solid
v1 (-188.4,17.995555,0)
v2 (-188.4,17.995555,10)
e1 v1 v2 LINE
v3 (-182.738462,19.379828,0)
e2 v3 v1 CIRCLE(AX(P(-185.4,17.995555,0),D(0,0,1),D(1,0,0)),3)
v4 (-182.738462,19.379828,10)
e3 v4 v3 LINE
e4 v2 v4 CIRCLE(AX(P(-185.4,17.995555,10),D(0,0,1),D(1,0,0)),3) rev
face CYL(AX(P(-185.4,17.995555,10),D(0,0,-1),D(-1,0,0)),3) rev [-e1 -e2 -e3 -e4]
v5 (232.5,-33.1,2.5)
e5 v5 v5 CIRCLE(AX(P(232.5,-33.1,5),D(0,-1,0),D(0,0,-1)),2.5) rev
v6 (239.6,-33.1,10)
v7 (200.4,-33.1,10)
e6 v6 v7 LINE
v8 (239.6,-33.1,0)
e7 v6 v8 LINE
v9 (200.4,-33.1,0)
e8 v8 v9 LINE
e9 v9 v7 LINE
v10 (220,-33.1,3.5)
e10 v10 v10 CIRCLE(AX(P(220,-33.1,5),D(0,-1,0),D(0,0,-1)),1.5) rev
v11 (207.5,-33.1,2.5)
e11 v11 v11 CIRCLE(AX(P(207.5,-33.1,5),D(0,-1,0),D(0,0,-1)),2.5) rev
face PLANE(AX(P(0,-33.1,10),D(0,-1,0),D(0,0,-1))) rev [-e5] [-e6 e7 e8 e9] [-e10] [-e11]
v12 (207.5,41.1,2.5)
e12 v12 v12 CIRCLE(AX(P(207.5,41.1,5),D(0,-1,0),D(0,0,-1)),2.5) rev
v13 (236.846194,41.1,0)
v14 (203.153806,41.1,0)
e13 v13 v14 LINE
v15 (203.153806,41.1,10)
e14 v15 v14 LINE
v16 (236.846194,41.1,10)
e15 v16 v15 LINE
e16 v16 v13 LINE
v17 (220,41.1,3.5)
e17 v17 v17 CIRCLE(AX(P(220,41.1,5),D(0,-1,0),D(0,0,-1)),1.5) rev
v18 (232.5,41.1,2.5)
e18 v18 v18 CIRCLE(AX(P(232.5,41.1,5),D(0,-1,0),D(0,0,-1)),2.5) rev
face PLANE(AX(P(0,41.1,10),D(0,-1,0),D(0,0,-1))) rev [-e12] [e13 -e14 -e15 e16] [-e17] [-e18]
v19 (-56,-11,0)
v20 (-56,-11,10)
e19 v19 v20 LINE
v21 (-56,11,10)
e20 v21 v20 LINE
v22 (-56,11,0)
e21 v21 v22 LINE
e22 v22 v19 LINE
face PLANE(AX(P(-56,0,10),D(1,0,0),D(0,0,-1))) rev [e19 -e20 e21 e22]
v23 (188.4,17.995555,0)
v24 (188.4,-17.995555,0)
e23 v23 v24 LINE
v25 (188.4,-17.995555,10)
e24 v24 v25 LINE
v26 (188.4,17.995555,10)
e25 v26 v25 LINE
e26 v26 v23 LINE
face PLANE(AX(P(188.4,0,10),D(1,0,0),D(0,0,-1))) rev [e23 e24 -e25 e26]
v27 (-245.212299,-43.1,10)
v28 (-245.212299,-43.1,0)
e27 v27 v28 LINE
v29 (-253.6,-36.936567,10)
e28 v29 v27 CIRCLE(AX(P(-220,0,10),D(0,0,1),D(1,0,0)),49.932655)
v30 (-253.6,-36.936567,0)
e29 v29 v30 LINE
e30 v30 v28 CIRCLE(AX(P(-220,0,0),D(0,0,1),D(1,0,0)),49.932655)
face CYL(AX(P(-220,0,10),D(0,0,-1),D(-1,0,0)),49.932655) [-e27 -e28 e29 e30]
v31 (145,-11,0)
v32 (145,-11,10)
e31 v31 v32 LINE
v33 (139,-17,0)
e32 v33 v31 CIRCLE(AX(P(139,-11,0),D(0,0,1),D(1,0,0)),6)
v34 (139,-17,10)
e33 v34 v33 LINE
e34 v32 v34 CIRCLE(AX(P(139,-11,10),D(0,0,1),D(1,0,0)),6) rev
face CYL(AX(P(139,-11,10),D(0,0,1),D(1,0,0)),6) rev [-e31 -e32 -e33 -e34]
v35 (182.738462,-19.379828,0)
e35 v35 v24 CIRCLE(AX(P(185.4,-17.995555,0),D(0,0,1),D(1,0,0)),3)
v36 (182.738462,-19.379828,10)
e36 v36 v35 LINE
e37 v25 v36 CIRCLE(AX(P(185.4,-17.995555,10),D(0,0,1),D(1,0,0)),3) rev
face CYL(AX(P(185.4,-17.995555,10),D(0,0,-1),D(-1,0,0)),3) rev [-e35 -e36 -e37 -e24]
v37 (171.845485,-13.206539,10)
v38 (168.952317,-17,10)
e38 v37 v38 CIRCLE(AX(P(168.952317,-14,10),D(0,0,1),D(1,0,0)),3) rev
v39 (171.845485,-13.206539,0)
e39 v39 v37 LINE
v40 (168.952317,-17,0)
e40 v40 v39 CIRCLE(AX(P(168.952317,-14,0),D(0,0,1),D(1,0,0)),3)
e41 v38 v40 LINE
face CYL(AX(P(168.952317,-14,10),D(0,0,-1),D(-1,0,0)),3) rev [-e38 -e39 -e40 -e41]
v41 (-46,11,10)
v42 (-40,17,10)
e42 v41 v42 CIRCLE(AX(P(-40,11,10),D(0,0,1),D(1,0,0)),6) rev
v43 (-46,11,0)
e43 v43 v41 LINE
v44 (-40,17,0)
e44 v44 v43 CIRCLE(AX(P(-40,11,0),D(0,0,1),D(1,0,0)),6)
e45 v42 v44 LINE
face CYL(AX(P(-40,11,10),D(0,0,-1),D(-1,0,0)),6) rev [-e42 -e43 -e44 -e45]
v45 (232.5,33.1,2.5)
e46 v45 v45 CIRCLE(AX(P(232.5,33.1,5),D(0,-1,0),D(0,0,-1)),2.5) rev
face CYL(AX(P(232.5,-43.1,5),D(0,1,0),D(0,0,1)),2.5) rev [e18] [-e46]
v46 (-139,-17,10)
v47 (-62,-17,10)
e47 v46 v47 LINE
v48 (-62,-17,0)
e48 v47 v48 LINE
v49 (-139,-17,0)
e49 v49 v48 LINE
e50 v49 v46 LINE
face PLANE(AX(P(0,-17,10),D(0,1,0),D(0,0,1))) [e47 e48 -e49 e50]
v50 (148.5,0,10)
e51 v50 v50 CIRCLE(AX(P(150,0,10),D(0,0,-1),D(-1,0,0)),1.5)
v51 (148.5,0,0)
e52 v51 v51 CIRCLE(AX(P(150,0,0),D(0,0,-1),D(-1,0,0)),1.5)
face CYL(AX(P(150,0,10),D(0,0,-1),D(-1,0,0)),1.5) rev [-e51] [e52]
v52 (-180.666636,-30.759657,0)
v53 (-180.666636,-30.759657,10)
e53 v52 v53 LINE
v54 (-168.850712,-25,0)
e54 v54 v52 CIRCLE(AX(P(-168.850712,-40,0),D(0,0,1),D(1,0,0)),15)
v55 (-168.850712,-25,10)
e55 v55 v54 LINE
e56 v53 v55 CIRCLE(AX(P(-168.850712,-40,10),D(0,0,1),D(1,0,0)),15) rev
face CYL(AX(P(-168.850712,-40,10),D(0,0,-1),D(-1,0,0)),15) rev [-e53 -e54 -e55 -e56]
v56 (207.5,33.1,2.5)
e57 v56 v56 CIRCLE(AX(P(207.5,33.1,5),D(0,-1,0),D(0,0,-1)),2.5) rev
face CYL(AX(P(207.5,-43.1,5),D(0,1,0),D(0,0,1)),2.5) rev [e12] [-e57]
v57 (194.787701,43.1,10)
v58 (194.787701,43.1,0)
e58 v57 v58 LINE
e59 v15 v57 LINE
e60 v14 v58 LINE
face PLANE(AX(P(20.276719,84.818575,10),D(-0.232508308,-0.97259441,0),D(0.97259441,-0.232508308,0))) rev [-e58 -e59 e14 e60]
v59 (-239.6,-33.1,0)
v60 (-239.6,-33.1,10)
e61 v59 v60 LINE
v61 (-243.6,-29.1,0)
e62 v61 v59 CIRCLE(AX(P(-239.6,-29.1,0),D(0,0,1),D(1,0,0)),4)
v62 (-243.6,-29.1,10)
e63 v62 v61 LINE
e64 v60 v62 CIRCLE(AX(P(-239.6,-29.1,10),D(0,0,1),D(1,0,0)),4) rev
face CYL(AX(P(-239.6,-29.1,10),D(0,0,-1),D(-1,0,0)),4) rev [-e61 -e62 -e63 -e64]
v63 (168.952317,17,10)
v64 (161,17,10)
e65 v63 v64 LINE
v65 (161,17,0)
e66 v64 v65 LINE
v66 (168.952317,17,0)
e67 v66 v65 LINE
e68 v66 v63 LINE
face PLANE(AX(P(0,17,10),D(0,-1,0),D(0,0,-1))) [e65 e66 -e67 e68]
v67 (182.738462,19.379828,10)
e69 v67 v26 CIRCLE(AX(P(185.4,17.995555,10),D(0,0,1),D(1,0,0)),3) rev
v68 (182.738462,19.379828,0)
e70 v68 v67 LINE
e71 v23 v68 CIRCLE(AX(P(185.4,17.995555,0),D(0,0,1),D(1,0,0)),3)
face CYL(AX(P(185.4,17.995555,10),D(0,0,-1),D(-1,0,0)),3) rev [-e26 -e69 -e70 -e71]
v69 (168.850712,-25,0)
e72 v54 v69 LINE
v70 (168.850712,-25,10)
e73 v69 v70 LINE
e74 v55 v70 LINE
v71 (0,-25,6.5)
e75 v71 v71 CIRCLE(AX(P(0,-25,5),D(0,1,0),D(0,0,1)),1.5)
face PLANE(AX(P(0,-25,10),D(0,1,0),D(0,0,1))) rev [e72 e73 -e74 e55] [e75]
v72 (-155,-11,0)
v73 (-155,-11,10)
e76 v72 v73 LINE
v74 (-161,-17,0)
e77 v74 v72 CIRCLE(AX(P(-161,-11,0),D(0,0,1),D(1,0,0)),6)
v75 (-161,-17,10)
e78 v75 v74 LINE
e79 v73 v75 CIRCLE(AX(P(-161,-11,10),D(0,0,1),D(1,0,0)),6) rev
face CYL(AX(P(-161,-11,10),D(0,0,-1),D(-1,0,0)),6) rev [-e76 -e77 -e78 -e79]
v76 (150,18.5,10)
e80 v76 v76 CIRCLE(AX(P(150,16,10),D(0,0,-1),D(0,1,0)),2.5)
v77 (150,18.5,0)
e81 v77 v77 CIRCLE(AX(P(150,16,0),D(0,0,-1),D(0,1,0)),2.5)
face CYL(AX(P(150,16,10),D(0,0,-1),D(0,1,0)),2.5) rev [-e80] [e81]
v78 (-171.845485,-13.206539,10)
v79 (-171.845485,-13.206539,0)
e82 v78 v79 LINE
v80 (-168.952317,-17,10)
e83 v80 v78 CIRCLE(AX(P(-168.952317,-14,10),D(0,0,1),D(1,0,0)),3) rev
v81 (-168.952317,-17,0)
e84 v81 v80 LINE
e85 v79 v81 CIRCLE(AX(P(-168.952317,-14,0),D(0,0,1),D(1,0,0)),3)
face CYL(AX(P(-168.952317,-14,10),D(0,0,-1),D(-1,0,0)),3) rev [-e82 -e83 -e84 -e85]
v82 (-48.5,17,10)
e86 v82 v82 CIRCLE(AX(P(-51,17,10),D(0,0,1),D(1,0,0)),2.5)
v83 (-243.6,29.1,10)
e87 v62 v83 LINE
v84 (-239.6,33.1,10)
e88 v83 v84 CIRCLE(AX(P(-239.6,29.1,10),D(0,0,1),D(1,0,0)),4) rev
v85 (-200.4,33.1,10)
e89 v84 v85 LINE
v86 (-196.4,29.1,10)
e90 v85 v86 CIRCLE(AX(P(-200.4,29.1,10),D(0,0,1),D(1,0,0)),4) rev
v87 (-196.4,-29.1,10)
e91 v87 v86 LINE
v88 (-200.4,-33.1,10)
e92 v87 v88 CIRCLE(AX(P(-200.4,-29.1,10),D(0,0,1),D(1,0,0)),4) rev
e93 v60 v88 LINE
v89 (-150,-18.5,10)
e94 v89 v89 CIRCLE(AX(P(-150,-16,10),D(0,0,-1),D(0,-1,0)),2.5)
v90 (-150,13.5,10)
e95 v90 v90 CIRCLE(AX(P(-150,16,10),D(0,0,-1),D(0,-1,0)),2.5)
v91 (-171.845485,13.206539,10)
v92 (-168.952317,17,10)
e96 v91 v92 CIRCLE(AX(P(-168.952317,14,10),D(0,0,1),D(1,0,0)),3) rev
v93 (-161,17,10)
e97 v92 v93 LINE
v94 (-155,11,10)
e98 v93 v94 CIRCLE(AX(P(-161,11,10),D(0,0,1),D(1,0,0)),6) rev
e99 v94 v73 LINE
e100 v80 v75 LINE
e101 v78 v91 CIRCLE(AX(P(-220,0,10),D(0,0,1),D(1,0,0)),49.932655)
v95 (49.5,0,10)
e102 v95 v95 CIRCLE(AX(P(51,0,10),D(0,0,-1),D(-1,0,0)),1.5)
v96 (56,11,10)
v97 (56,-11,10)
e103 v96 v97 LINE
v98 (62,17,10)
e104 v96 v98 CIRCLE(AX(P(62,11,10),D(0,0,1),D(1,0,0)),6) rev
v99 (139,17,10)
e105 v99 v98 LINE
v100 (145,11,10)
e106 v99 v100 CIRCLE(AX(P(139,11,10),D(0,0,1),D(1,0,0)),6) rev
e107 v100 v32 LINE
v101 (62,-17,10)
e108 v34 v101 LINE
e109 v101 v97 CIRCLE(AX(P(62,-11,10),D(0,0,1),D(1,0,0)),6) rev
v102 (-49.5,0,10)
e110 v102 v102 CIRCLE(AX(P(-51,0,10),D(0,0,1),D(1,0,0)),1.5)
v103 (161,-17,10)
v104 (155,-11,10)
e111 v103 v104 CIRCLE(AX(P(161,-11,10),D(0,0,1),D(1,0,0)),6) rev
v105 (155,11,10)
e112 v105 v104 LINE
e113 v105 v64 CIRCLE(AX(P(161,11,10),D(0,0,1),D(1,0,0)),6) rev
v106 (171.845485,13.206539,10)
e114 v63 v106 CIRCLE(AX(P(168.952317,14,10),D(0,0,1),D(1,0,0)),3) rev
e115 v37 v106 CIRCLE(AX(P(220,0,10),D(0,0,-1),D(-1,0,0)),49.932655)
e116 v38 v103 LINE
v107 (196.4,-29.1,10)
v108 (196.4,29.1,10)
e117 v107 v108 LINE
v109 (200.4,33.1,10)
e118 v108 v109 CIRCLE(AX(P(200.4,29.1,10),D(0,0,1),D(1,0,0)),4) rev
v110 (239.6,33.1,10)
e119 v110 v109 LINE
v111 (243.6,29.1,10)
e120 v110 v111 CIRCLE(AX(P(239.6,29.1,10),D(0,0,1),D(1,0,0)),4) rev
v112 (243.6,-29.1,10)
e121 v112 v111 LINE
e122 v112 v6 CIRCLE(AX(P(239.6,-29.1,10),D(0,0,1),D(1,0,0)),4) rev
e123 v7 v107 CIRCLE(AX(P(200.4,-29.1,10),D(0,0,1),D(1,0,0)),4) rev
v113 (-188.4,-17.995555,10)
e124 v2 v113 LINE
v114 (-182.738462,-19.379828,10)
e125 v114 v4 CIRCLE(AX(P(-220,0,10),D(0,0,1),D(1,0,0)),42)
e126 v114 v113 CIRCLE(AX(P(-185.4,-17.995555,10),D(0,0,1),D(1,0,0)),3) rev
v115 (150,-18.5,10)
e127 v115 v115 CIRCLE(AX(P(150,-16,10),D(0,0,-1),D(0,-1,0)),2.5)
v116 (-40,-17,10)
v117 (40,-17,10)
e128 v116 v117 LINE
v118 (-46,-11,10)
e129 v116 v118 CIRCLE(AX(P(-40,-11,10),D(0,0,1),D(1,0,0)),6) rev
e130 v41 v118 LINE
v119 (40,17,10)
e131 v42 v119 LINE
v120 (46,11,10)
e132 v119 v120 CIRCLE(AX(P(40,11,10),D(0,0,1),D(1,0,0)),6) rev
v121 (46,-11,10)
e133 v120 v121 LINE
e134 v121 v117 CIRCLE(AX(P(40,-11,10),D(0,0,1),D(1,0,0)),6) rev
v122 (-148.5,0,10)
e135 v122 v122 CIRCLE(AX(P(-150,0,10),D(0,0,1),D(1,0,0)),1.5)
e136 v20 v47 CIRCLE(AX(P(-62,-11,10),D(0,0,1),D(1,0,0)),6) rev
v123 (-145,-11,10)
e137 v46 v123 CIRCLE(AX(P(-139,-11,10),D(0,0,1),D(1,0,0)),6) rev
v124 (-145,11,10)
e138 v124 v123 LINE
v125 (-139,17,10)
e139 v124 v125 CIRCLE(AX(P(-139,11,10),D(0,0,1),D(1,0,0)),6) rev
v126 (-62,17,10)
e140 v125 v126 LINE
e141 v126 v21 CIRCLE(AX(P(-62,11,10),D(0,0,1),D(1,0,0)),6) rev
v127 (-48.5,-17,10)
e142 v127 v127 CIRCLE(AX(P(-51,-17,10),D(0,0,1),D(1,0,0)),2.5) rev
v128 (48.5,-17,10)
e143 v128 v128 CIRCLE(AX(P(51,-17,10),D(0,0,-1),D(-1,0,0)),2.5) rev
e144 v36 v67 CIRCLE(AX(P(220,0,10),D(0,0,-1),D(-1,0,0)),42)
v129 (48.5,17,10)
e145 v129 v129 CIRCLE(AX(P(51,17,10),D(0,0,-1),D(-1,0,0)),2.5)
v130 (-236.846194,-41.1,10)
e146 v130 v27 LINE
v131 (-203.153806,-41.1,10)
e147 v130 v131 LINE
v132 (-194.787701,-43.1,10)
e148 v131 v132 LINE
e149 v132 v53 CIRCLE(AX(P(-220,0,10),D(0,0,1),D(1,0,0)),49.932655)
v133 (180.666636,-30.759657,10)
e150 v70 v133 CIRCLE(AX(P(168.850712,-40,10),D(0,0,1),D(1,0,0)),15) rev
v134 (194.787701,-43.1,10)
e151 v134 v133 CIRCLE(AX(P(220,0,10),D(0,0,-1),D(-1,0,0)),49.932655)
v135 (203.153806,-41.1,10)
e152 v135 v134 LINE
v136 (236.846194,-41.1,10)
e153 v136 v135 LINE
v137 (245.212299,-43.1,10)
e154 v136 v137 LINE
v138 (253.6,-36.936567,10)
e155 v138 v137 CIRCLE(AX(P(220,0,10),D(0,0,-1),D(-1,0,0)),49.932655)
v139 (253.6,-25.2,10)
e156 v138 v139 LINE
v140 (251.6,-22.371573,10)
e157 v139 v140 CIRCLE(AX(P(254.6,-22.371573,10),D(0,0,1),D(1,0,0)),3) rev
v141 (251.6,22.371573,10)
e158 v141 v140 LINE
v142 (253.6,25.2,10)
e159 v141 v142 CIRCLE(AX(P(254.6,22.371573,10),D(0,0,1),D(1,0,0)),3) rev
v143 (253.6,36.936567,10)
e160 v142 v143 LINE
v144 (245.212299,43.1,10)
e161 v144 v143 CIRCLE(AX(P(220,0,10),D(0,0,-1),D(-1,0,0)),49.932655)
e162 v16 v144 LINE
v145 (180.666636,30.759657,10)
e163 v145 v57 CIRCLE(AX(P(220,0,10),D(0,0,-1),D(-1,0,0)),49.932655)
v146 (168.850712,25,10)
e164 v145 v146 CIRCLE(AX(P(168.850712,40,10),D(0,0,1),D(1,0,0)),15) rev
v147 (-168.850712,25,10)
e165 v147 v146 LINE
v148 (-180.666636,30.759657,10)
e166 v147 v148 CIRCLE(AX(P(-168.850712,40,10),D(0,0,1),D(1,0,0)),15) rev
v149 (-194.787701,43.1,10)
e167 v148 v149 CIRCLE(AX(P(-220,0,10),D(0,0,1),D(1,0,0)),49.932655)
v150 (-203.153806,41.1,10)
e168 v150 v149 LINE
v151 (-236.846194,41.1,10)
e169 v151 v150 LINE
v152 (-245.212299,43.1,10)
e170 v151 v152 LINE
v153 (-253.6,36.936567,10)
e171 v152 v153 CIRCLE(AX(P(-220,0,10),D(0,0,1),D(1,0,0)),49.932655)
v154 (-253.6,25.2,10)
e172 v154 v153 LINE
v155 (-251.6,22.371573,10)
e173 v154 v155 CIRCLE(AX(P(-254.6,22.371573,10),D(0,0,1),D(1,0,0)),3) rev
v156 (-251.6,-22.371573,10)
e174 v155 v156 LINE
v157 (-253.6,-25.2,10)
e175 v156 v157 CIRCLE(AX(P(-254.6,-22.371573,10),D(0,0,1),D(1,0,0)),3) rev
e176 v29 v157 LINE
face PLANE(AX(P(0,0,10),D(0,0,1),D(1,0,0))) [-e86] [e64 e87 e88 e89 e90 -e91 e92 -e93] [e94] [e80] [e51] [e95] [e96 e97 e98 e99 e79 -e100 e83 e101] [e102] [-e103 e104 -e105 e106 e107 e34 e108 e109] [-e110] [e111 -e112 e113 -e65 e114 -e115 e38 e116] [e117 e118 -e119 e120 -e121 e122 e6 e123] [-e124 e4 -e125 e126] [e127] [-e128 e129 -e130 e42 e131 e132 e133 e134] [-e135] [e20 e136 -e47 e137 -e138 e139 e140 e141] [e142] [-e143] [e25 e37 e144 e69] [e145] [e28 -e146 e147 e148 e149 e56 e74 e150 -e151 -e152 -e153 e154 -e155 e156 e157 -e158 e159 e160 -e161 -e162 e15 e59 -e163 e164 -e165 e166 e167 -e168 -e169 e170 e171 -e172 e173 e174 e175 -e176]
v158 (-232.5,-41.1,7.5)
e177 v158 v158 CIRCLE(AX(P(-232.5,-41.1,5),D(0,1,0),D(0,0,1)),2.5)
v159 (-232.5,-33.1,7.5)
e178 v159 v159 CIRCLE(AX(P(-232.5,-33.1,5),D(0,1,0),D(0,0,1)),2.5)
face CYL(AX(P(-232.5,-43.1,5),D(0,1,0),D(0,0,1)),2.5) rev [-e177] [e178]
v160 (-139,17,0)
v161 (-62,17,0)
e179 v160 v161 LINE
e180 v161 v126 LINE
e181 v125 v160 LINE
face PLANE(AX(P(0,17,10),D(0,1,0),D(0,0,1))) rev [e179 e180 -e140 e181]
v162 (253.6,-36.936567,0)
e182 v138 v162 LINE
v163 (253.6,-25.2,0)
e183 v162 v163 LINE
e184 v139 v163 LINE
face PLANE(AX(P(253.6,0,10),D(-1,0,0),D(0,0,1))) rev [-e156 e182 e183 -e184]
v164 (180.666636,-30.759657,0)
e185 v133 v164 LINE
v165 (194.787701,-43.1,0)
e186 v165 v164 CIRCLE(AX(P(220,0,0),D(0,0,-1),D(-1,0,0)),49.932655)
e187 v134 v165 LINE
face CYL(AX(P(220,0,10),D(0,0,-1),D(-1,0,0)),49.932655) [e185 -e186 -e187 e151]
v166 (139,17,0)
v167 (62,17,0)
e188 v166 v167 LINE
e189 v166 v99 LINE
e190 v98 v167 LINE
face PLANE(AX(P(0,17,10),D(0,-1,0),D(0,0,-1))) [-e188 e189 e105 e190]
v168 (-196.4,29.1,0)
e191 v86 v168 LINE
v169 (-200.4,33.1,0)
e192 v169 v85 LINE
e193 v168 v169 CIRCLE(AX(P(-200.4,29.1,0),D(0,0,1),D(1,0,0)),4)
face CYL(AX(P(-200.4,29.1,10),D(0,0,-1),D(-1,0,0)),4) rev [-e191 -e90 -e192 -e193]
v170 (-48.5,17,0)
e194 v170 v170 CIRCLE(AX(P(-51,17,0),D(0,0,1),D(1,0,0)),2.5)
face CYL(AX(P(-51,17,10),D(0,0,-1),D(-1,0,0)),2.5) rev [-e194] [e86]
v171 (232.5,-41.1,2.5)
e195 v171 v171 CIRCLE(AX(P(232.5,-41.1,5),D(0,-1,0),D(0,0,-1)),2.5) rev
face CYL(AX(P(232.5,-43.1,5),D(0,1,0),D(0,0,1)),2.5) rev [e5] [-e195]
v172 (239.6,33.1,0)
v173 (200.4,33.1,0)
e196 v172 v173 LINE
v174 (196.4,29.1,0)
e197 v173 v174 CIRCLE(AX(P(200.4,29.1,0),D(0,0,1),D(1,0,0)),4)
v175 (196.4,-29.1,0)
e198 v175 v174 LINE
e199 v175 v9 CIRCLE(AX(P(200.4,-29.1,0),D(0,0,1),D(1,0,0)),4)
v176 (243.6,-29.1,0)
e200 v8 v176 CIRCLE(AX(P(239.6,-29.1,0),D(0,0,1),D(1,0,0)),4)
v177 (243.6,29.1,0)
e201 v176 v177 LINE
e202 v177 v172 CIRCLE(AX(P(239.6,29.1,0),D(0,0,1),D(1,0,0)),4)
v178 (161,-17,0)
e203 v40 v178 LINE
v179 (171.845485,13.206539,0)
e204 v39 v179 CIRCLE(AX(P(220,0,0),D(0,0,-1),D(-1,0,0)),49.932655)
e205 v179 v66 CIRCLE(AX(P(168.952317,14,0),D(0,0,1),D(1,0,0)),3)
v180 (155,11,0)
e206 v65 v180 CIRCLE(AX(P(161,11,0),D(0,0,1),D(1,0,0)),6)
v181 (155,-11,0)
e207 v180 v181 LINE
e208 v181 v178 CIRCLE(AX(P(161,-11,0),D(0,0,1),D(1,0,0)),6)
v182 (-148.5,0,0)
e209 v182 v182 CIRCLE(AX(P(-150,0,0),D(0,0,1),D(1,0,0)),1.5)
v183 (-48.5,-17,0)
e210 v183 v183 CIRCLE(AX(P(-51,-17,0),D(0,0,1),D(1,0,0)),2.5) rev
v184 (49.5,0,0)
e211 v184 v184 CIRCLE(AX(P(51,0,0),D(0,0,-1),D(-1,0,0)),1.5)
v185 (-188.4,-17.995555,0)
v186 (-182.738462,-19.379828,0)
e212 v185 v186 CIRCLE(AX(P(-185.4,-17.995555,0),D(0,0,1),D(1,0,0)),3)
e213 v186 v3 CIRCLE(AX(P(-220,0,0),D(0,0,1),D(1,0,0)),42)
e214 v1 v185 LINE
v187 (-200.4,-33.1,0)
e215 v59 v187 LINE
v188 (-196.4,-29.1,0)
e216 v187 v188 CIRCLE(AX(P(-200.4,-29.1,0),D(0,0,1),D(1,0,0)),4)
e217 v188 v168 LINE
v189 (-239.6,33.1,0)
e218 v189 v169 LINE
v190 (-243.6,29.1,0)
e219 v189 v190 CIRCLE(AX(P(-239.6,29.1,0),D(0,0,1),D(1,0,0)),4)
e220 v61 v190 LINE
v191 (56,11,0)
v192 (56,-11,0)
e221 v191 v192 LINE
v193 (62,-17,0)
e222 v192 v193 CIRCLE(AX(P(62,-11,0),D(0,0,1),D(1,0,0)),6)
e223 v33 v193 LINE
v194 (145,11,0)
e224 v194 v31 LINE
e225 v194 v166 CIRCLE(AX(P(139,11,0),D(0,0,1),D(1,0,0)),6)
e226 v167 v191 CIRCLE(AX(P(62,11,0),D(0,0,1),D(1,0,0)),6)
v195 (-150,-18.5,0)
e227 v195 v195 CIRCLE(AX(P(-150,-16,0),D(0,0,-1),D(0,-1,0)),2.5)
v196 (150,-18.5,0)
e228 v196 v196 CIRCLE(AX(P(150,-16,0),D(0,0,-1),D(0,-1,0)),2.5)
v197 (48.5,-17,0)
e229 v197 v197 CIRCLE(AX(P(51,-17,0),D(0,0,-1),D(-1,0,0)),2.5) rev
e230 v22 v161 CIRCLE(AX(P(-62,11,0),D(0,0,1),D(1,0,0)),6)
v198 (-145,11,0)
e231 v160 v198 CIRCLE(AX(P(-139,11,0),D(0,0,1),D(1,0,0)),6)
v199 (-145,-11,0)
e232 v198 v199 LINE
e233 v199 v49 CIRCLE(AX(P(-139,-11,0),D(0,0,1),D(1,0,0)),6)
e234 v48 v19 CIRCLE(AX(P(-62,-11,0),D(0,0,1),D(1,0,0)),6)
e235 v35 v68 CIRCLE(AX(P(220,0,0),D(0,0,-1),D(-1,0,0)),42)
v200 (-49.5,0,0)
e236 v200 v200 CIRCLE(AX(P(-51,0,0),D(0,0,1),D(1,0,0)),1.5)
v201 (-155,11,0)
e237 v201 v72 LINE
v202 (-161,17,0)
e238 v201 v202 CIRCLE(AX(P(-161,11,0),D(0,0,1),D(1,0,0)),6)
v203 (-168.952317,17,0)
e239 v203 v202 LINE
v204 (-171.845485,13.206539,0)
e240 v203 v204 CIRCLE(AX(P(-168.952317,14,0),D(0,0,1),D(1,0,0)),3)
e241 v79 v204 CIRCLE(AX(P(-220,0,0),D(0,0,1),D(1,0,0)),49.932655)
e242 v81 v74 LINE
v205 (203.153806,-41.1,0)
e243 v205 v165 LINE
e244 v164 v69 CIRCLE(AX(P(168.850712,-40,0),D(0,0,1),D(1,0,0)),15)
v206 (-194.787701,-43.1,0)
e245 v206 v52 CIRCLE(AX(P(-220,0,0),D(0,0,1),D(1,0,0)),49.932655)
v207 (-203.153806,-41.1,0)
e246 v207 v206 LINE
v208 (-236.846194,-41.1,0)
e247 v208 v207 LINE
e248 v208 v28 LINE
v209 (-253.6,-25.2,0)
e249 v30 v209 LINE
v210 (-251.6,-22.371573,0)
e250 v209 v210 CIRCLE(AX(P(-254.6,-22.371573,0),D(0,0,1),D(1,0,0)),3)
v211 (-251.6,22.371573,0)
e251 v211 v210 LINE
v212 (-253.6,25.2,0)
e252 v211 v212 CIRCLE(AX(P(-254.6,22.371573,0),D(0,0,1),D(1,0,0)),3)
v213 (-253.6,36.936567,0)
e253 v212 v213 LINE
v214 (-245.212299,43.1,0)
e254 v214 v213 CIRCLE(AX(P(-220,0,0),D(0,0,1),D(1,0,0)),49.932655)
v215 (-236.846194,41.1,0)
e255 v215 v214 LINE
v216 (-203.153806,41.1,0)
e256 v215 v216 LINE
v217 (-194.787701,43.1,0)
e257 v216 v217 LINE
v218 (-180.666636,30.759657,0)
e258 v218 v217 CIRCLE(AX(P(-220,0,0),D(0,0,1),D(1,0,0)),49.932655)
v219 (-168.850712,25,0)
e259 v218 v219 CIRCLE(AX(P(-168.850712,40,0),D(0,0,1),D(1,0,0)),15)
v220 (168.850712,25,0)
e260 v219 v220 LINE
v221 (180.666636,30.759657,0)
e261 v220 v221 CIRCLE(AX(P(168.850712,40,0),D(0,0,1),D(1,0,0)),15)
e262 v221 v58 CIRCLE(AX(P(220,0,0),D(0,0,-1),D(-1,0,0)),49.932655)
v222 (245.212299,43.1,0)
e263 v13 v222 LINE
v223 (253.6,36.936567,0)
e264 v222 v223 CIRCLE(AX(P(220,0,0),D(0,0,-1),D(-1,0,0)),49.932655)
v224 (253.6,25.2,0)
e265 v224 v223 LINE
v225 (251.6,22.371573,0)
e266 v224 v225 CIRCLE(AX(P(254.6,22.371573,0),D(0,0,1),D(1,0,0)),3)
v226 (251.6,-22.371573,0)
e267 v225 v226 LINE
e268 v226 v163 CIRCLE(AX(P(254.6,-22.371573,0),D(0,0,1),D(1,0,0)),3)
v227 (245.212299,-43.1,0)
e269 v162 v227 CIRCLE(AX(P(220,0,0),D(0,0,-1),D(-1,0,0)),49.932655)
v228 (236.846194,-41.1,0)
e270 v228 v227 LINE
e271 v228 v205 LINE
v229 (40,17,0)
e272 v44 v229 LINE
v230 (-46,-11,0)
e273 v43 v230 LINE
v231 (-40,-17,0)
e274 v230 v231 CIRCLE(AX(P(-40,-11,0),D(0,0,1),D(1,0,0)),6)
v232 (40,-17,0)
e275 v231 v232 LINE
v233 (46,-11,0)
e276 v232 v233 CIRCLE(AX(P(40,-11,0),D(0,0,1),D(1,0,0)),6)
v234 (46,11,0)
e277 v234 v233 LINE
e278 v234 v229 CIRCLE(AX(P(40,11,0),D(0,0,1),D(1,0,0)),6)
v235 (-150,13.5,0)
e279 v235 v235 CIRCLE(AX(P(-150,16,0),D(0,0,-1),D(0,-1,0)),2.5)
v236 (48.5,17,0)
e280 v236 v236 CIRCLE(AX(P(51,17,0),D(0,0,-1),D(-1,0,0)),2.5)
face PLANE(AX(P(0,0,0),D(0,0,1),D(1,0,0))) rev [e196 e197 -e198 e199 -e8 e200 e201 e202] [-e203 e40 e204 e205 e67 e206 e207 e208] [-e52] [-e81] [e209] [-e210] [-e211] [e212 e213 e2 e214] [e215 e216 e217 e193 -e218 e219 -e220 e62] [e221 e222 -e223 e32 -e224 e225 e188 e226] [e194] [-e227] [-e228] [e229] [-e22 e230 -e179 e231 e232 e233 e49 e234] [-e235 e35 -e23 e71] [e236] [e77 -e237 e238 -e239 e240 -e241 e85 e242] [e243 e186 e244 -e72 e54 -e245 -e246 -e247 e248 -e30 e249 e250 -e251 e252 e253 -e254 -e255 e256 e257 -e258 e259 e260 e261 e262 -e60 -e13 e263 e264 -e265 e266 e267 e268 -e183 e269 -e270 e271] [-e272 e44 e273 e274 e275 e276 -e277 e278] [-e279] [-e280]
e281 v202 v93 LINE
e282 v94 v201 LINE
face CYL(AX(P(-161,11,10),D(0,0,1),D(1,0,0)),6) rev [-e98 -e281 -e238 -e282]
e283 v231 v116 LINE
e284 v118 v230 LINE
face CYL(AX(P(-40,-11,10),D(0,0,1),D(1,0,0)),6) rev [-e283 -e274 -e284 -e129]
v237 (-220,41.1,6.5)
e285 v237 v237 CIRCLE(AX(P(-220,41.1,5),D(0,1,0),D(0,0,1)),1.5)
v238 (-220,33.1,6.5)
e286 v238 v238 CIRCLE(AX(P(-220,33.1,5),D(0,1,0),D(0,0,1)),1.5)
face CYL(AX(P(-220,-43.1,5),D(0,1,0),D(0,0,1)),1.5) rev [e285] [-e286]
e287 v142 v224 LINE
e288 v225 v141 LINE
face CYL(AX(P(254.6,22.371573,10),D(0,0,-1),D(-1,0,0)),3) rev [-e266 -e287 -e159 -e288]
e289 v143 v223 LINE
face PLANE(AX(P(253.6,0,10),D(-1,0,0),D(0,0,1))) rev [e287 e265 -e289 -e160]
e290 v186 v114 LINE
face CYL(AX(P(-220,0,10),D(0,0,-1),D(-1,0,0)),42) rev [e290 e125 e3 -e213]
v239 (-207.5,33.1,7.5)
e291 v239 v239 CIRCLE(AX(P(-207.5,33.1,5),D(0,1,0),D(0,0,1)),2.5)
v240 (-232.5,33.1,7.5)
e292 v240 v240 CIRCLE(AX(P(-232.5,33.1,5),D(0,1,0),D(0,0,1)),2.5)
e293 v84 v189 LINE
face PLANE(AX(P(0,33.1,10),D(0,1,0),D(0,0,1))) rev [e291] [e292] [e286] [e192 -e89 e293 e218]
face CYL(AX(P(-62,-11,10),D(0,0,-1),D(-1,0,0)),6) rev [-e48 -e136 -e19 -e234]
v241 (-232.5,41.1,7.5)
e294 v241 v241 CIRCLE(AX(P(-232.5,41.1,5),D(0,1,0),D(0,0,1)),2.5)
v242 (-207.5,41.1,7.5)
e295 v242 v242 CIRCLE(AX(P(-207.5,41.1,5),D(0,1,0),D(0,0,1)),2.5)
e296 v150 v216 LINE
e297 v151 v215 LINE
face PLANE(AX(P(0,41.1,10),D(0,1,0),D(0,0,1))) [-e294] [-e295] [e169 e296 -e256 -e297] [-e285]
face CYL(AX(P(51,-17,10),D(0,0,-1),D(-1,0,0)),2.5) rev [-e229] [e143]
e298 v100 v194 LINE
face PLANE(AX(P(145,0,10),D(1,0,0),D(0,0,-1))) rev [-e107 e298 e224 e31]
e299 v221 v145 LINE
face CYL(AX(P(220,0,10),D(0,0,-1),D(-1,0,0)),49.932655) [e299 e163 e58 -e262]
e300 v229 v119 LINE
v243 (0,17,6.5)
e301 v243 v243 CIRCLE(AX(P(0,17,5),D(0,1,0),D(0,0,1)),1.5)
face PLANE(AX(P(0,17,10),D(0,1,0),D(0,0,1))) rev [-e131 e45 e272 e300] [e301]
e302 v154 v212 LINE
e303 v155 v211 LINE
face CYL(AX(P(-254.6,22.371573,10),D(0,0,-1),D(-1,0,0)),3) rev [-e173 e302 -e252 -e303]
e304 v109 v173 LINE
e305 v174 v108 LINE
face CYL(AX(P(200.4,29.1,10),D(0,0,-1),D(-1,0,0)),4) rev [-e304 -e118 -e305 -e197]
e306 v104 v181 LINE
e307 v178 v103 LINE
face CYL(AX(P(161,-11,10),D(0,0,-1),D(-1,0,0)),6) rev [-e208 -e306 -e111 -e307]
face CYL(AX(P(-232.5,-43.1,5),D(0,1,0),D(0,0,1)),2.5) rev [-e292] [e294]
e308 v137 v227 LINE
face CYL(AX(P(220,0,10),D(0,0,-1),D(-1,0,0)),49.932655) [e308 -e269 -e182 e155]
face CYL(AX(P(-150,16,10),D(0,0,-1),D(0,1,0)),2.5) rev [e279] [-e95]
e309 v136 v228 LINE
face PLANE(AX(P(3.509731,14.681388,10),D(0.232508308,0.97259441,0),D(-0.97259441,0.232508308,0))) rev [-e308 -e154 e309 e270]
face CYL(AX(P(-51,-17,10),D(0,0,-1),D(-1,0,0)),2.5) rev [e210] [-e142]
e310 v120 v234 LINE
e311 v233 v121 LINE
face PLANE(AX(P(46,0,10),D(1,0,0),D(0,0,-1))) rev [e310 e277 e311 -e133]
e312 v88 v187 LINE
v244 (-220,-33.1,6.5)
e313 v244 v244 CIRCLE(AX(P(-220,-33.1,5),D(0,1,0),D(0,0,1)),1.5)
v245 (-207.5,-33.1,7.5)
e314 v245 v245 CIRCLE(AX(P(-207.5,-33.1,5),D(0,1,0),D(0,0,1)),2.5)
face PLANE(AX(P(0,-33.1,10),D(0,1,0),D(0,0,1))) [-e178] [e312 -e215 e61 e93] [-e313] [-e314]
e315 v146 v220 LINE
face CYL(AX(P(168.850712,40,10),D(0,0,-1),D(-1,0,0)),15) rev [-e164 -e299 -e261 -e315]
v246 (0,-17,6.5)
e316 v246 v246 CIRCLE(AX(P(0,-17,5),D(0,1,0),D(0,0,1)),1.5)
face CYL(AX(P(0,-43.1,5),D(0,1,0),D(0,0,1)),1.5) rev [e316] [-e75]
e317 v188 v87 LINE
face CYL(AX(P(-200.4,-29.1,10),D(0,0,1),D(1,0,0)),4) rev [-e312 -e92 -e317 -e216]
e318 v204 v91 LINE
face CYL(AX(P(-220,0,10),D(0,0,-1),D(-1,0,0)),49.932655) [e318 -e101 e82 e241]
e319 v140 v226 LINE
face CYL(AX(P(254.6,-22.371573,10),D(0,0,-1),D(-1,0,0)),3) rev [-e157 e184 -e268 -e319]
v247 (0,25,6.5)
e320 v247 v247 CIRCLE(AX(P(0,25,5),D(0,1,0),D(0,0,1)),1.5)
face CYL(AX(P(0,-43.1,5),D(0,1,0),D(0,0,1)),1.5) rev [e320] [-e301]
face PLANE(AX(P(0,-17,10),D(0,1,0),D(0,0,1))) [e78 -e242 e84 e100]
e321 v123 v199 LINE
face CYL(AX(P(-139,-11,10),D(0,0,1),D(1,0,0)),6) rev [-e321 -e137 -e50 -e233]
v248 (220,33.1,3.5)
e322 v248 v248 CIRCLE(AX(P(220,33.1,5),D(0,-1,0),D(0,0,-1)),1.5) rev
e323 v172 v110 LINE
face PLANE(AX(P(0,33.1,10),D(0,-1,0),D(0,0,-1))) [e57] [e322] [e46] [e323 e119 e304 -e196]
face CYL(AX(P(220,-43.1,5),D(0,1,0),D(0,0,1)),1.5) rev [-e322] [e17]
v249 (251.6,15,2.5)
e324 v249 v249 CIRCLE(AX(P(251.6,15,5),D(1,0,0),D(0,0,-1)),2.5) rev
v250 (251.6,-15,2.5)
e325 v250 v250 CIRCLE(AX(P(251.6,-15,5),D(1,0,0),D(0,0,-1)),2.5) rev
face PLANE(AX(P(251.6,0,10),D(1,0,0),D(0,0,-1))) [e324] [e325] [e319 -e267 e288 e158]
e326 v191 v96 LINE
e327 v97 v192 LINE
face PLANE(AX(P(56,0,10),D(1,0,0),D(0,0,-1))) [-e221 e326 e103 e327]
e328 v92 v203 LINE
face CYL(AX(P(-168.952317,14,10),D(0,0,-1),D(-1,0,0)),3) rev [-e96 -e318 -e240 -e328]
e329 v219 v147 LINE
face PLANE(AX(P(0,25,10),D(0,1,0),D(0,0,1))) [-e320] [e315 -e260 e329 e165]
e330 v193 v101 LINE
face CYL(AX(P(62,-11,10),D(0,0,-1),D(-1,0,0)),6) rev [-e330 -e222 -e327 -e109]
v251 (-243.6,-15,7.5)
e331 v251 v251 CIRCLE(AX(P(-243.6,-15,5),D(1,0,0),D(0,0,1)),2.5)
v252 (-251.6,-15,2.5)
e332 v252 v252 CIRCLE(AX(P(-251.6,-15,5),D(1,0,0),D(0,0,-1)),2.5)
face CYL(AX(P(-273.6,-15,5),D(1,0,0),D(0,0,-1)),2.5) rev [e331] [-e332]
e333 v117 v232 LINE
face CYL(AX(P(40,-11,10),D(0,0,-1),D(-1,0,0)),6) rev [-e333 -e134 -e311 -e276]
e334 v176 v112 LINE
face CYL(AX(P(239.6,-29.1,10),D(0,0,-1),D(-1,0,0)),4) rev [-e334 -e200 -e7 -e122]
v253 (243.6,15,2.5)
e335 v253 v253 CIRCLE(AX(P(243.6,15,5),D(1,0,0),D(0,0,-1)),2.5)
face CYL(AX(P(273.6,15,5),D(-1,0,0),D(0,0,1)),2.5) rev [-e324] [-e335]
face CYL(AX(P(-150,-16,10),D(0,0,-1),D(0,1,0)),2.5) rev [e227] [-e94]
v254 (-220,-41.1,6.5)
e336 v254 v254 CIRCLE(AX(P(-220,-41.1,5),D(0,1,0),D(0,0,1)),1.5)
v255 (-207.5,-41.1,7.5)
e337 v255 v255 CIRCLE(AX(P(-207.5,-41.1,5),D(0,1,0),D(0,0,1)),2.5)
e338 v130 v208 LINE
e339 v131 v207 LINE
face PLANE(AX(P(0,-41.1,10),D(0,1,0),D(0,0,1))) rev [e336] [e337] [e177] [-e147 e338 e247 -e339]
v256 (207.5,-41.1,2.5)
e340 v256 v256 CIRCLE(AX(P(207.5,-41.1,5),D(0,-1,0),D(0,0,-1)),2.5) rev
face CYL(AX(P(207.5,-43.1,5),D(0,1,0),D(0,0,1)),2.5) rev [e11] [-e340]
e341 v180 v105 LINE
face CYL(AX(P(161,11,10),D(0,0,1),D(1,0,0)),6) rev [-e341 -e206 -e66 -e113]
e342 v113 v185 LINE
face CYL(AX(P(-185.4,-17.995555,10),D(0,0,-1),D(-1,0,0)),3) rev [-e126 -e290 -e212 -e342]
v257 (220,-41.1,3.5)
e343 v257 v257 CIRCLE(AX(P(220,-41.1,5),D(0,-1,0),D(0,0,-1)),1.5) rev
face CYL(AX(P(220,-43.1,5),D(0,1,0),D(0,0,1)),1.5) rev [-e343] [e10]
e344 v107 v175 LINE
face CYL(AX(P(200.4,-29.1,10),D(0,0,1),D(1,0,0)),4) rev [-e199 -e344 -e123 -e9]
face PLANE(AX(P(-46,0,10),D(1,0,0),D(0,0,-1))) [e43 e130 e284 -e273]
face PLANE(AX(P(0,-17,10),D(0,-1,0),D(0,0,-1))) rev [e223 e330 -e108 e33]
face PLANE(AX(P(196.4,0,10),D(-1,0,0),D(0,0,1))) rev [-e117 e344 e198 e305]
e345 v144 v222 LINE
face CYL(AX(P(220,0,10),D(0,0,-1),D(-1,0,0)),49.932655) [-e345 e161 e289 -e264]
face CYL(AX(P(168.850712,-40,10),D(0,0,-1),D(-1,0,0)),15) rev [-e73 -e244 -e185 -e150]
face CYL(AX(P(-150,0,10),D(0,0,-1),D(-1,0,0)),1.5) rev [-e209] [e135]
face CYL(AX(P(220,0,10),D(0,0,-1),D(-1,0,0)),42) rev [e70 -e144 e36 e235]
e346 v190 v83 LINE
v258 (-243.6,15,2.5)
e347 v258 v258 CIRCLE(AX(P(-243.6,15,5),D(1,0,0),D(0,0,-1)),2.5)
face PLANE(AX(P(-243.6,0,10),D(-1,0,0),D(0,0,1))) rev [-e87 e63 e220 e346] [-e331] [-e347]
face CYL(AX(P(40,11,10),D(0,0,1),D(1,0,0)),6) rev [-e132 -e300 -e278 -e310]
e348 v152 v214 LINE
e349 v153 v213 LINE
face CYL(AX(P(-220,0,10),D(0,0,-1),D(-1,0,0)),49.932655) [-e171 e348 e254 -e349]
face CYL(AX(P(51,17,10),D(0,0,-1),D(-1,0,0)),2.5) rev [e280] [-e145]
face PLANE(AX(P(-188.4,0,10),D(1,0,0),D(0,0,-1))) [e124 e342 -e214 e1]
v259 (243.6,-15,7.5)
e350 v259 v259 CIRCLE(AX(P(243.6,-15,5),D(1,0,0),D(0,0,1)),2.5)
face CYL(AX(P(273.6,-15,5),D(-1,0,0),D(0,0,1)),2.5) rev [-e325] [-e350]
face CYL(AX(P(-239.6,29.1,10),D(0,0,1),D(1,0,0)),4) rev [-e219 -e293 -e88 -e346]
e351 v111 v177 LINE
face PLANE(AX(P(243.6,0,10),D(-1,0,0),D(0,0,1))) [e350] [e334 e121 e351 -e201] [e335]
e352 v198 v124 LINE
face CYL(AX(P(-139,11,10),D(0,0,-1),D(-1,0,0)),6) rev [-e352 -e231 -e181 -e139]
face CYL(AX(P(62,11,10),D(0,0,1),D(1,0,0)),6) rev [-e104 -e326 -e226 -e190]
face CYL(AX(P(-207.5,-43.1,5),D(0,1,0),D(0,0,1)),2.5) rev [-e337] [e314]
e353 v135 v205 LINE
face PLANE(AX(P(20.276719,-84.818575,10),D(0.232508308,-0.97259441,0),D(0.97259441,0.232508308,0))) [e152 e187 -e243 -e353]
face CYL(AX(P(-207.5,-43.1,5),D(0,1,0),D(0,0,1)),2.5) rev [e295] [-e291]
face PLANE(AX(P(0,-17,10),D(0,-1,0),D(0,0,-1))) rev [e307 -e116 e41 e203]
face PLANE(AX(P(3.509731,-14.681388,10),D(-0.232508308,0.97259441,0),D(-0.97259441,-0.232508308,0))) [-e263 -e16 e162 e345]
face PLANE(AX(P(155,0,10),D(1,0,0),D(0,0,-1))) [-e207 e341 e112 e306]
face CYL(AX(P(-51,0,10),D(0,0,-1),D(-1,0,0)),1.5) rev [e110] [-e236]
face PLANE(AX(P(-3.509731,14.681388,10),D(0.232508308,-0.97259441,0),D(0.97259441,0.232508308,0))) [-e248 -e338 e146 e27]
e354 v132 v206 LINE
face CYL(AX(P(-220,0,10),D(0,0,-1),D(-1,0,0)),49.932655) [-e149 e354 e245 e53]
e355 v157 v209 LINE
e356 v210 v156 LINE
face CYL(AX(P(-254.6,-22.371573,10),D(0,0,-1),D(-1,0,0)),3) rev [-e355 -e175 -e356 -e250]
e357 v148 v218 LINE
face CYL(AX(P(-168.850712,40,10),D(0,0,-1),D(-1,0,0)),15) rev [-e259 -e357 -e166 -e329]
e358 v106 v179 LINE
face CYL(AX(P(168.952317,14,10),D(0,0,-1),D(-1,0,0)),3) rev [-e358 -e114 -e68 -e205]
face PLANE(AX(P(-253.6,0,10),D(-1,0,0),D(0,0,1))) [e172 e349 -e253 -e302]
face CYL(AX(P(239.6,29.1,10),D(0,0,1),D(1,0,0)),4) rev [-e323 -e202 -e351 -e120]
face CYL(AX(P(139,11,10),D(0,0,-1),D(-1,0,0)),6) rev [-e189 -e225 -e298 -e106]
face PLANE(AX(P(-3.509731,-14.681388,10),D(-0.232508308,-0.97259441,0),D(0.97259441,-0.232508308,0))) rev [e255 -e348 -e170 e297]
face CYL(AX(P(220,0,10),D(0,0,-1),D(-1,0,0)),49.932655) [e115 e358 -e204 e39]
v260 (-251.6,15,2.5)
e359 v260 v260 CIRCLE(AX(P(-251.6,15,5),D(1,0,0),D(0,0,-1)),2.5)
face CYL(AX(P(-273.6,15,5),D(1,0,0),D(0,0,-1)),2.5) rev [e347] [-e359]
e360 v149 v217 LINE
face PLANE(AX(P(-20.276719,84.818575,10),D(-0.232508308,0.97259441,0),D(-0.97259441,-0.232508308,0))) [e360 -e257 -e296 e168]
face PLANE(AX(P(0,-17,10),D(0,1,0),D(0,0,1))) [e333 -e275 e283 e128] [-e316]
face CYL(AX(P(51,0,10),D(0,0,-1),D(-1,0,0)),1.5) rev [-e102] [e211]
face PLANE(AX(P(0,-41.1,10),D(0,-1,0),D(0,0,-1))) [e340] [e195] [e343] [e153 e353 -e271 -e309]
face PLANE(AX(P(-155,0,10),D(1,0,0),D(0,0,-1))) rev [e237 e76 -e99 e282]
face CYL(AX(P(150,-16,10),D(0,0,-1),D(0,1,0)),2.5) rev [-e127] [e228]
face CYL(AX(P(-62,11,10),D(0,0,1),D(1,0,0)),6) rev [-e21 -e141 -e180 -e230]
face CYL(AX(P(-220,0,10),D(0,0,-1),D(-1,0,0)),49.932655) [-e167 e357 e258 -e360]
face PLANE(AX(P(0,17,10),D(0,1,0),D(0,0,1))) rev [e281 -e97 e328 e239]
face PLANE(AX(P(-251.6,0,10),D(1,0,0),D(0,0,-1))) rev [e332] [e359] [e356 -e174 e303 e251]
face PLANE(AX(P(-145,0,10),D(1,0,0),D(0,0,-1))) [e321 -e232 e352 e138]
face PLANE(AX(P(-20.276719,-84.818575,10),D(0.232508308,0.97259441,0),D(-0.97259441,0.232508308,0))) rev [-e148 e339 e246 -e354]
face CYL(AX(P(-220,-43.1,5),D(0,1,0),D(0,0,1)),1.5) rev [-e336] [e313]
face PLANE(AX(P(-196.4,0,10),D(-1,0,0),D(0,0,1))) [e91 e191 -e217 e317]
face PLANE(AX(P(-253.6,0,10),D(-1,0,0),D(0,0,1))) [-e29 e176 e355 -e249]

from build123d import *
from build123d.topology import SkipClean

# Parameters (mm, degrees)
SKETCH_1_R              = 2.5
SKETCH_1_W              = 47.2
SKETCH_1_H              = 66.2
SKETCH_1_R_2            = 1.5
SKETCH_1_W_2            = 89
SKETCH_1_H_2            = 34
EXTRUDE_1_DEPTH         = 10
FILLET_1_R              = 4
FILLET_4_R              = 6
FILLET_7_R              = 3
FILLET_8_R              = 3
SKETCH_2_R              = 2.5
SKETCH_2_R_2            = 1.5
CUT_EXTRUDE_1_DEPTH     = 258.430709124
SKETCH_3_R              = 2.5
CUT_EXTRUDE_2_DEPTH     = 30
SKETCH_4_R              = 1.5
CUT_EXTRUDE_3_DEPTH     = 263.774751451
FILLET_10_R             = 15
FILLET_11_R             = 3
FILLET_1_OF_MIRROR_1_R  = 4
FILLET_4_OF_MIRROR_1_R  = 6
FILLET_7_OF_MIRROR_1_R  = 3
FILLET_8_OF_MIRROR_1_R  = 3
FILLET_10_OF_MIRROR_1_R = 15
FILLET_11_OF_MIRROR_1_R = 3
SKETCH_5_R              = 2.5
EXTRUDE_2_DEPTH         = 10
SKETCH_6_R              = 2.5
CUT_EXTRUDE_4_DEPTH     = 10
EXTRUDE_3_DEPTH         = 10
SKETCH_8_R              = 2.5
CUT_EXTRUDE_5_DEPTH     = 10


with BuildPart() as part:
    # 草图1 → 凸台-拉伸1 (new body)
    with BuildSketch(Plane.XY):
        with BuildLine():
            Line((-46, -17), (-46, 17))
            Line((-46, 17), (0, 17))
            Line((0, 17), (0, 25))
            Line((0, 25), (-176.776511015, 25))
            ThreePointArc((-176.776511015, 25), (-184.605554742, 35.220778596), (-194.787701414, 43.1))
            Line((-194.787701414, 43.1), (-203.153806011, 41.1))
            Line((-203.153806011, 41.1), (-236.846193989, 41.1))
            Line((-236.846193989, 41.1), (-245.212298586, 43.1))
            ThreePointArc((-245.212298586, 43.1), (-249.567187761, 40.23743789), (-253.6, 36.936567247))
            Line((-253.6, 36.936567247), (-253.6, 25.2))
            ThreePointArc((-253.6, 25.2), (-252.623320065, 26.452201949), (-251.6, 27.666586345))
            Line((-251.6, 27.666586345), (-251.6, -27.666586345))
            ThreePointArc((-251.6, -27.666586345), (-252.623320065, -26.452201949), (-253.6, -25.2))
            Line((-253.6, -25.2), (-253.6, -36.936567247))
            ThreePointArc((-253.6, -36.936567247), (-249.567187761, -40.23743789), (-245.212298586, -43.1))
            Line((-245.212298586, -43.1), (-236.846193989, -41.1))
            Line((-236.846193989, -41.1), (-203.153806011, -41.1))
            Line((-203.153806011, -41.1), (-194.787701414, -43.1))
            ThreePointArc((-194.787701414, -43.1), (-184.605554742, -35.220778596), (-176.776511015, -25))
            Line((-176.776511015, -25), (0, -25))
            Line((0, -25), (0, -17))
            Line((0, -17), (-46, -17))
        make_face()
        with Locations((-51, 17)):
            Circle(SKETCH_1_R, mode=Mode.SUBTRACT)
        with Locations((-150, -19)):
            Circle(SKETCH_1_R, mode=Mode.SUBTRACT)
        with BuildLine():
            Line((-188.4, -27.666586345), (-188.4, 27.666586345))
            ThreePointArc((-188.4, 27.666586345), (-178, 0), (-188.4, -27.666586345))
        make_face(mode=Mode.SUBTRACT)
        with BuildLine():
            Line((-155, -17), (-173.050346114, -17))
            ThreePointArc((-173.050346114, -17), (-170.067345354, 0), (-173.050346114, 17))
            Line((-173.050346114, 17), (-155, 17))
            Line((-155, 17), (-155, -17))
        make_face(mode=Mode.SUBTRACT)
        with Locations((-51, -17)):
            Circle(SKETCH_1_R, mode=Mode.SUBTRACT)
        with Locations((-220, 0)):
            Rectangle(SKETCH_1_W, SKETCH_1_H, mode=Mode.SUBTRACT)
        with Locations((-150, 0)):
            Circle(SKETCH_1_R_2, mode=Mode.SUBTRACT)
        with Locations((-150, 19)):
            Circle(SKETCH_1_R, mode=Mode.SUBTRACT)
        with Locations((-100.5, 0)):
            Rectangle(SKETCH_1_W_2, SKETCH_1_H_2, mode=Mode.SUBTRACT)
        with Locations((-51, 0)):
            Circle(SKETCH_1_R_2, mode=Mode.SUBTRACT)
    extrude_1 = extrude(amount=EXTRUDE_1_DEPTH)

    # 圆角1
    fillet_1_edges = [part.edges().sort_by_distance(p)[0] for p in [
        (-196.4, 33.1, 5),
        (-243.6, 33.1, 5),
        (-243.6, -33.1, 5),
        (-196.4, -33.1, 5),
    ]]
    fillet(fillet_1_edges, radius=FILLET_1_R)

    # 圆角4
    fillet_4_edges = [part.edges().sort_by_distance(p)[0] for p in [
        (-155, -17, 5),
        (-155, 17, 5),
        (-145, 17, 5),
        (-145, -17, 5),
        (-56, -17, 5),
        (-56, 17, 5),
        (-46, -17, 5),
        (-46, 17, 5),
    ]]
    fillet(fillet_4_edges, radius=FILLET_4_R)

    # 圆角7
    # the kernel refuses this fillet: 3 mm, written as the material it adds along each edge
    with BuildSketch(Plane(origin=(-251.6, -27.666586345, 0), x_dir=(-0.6298143321188929, 0.7767457158283095, 0), z_dir=(0, 0, 1))) as fillet_7_piece_1:
        with BuildLine():
            CenterArc((6.002322024, -1.004638225), FILLET_7_R, 160.43479501, 70.528779366)
            Line((4.112879028, -3.334875372), (4.075090168, -3.381480115))
            Line((4.075090168, -3.381480115), (-0.03778886, -0.046604743))
            Line((-0.03778886, -0.046604743), (-0.002268242, 0.05995711))
            ThreePointArc((-0.002268242, 0.05995711), (1.58776952, 0.090022779), (3.119003381, 0.020092764))
            Line((3.119003381, 0.020092764), (3.175539041, 0))
        make_face()
    extrude(amount=10)
    with BuildSketch(Plane(origin=(-251.6, 27.666586345, 0), x_dir=(0, -1, 0), z_dir=(0, 0, 1))) as fillet_7_piece_2:
        with BuildLine():
            CenterArc((5.29501347, -3), FILLET_7_R, 90, 70.528779366)
            Line((2.466586345, -2), (2.410017803, -1.98))
            ThreePointArc((2.410017803, -1.98), (1.176595536, -1.069924808), (-0.039523695, -0.045142857))
            Line((-0.039523695, -0.045142857), (0, 0.06))
            Line((0, 0.06), (5.29501347, 0.06))
            Line((5.29501347, 0.06), (5.29501347, 0))
        make_face()
    extrude(amount=10)

    # 圆角8
    fillet_8_edges = [part.edges().sort_by_distance(p)[0] for p in [
        (-188.4, 27.666586345, 5),
        (-188.4, -27.666586345, 5),
    ]]
    fillet(fillet_8_edges, radius=FILLET_8_R)

    # 草图2 → 切除-拉伸1 (cut, symmetric)
    with BuildSketch(Plane(origin=(0, 0, 0), x_dir=(1, 0, 0), z_dir=(0, 1, 0))):
        with Locations(Location((-232.5, -5, 0), (0, 0, 270))):
            Circle(SKETCH_2_R)
        with Locations(Location((-207.5, -5, 0), (0, 0, 270))):
            Circle(SKETCH_2_R)
        with Locations(Location((-220, -5, 0), (0, 0, 270))):
            Circle(SKETCH_2_R_2)
    cut_extrude_1 = extrude(amount=CUT_EXTRUDE_1_DEPTH, both=True, mode=Mode.SUBTRACT)

    # 草图3 → 切除-拉伸2 (cut)
    with BuildSketch(Plane(origin=(-243.6, 0, 0), x_dir=(0, 0, -1), z_dir=(1, 0, 0))):
        with Locations((-5, 15)):
            Circle(SKETCH_3_R)
        with Locations((-5, -15)):
            Circle(SKETCH_3_R)
    cut_extrude_2 = extrude(amount=-CUT_EXTRUDE_2_DEPTH, mode=Mode.SUBTRACT)

    # 草图4 → 切除-拉伸3 (cut, through all)
    with BuildSketch(Plane(origin=(0, 25, 0), x_dir=(1, 0, 0), z_dir=(0, 1, 0))):
        with Locations((0, -5)):
            Circle(SKETCH_4_R)
    cut_extrude_3 = extrude(amount=-CUT_EXTRUDE_3_DEPTH, mode=Mode.SUBTRACT)

    # 圆角10
    fillet_10_edges = [part.edges().sort_by_distance(p)[0] for p in [
        (-176.776511015, -25, 5),
        (-176.776511015, 25, 5),
    ]]
    fillet(fillet_10_edges, radius=FILLET_10_R)

    # 圆角11
    fillet_11_edges = [part.edges().sort_by_distance(p)[0] for p in [
        (-173.050346114, 17, 5),
        (-173.050346114, -17, 5),
    ]]
    fillet(fillet_11_edges, radius=FILLET_11_R)

    # 镜向1: 凸台-拉伸1, 切除-拉伸1, 切除-拉伸2, 切除-拉伸3 across plane
    with SkipClean():  # the faces are left unmerged after this step: merging them gives an invalid solid
        add(extrude_1.mirror(Plane(origin=(0, 0, 10), x_dir=(0, 0, 1), z_dir=(1, 0, 0))))
        add(cut_extrude_1.mirror(Plane(origin=(0, 0, 10), x_dir=(0, 0, 1), z_dir=(1, 0, 0))), mode=Mode.SUBTRACT)
        add(cut_extrude_2.mirror(Plane(origin=(0, 0, 10), x_dir=(0, 0, 1), z_dir=(1, 0, 0))), mode=Mode.SUBTRACT)
        add(cut_extrude_3.mirror(Plane(origin=(0, 0, 10), x_dir=(0, 0, 1), z_dir=(1, 0, 0))), mode=Mode.SUBTRACT)

    # 圆角1 of 镜向1
    fillet_1_of_mirror_1_edges = [part.edges().sort_by_distance(p)[0] for p in [
        (196.4, 33.1, 5),
        (243.6, 33.1, 5),
        (243.6, -33.1, 5),
        (196.4, -33.1, 5),
    ]]
    fillet(fillet_1_of_mirror_1_edges, radius=FILLET_1_OF_MIRROR_1_R)

    # 圆角4 of 镜向1
    fillet_4_of_mirror_1_edges = [part.edges().sort_by_distance(p)[0] for p in [
        (155, -17, 5),
        (155, 17, 5),
        (145, 17, 5),
        (145, -17, 5),
        (56, -17, 5),
        (56, 17, 5),
        (46, -17, 5),
        (46, 17, 5),
    ]]
    fillet(fillet_4_of_mirror_1_edges, radius=FILLET_4_OF_MIRROR_1_R)

    # 圆角7 of 镜向1
    # the kernel refuses this fillet: 3 mm, written as the material it adds along each edge
    with BuildSketch(Plane(origin=(251.6, -27.666586345, 0), x_dir=(0, 1, 0), z_dir=(0, 0, 1))) as fillet_7_of_mirror_1_piece_1:
        with BuildLine():
            CenterArc((5.29501347, -3), FILLET_7_OF_MIRROR_1_R, 90, 70.528779366)
            Line((2.466586345, -2), (2.410017803, -1.98))
            ThreePointArc((2.410017803, -1.98), (1.176595536, -1.069924808), (-0.039523695, -0.045142857))
            Line((-0.039523695, -0.045142857), (0, 0.06))
            Line((0, 0.06), (5.29501347, 0.06))
            Line((5.29501347, 0.06), (5.29501347, 0))
        make_face()
    extrude(amount=10)
    with BuildSketch(Plane(origin=(251.6, 27.666586345, 0), x_dir=(0.6298143321188939, -0.7767457158283085, 0), z_dir=(0, 0, 1))) as fillet_7_of_mirror_1_piece_2:
        with BuildLine():
            CenterArc((6.002322024, -1.004638225), FILLET_7_OF_MIRROR_1_R, 160.43479501, 70.528779366)
            Line((4.112879028, -3.334875372), (4.075090168, -3.381480115))
            Line((4.075090168, -3.381480115), (-0.03778886, -0.046604743))
            Line((-0.03778886, -0.046604743), (-0.002268242, 0.05995711))
            ThreePointArc((-0.002268242, 0.05995711), (1.58776952, 0.090022779), (3.119003381, 0.020092764))
            Line((3.119003381, 0.020092764), (3.175539041, 0))
        make_face()
    extrude(amount=10)

    # 圆角8 of 镜向1
    fillet_8_of_mirror_1_edges = [part.edges().sort_by_distance(p)[0] for p in [
        (188.4, 27.666586345, 5),
        (188.4, -27.666586345, 5),
    ]]
    fillet(fillet_8_of_mirror_1_edges, radius=FILLET_8_OF_MIRROR_1_R)

    # 圆角10 of 镜向1
    fillet_10_of_mirror_1_edges = [part.edges().sort_by_distance(p)[0] for p in [
        (176.776511015, -25, 5),
        (176.776511015, 25, 5),
    ]]
    fillet(fillet_10_of_mirror_1_edges, radius=FILLET_10_OF_MIRROR_1_R)

    # 圆角11 of 镜向1
    fillet_11_of_mirror_1_edges = [part.edges().sort_by_distance(p)[0] for p in [
        (173.050346114, 17, 5),
        (173.050346114, -17, 5),
    ]]
    fillet(fillet_11_of_mirror_1_edges, radius=FILLET_11_OF_MIRROR_1_R)

    # 草图5 → 凸台-拉伸2 (add)
    with BuildSketch(Plane(origin=(0, 0, 0), x_dir=(-1, 0, 0), z_dir=(0, 0, -1))):
        with Locations((150, 19)):
            Circle(SKETCH_5_R)
        with Locations((150, -19)):
            Circle(SKETCH_5_R)
        with Locations((-150, -19)):
            Circle(SKETCH_5_R)
        with Locations((-150, 19)):
            Circle(SKETCH_5_R)
    extrude(amount=-EXTRUDE_2_DEPTH)

    # 草图6 → 切除-拉伸4 (cut)
    with BuildSketch(Plane(origin=(0, 0, 0), x_dir=(-1, 0, 0), z_dir=(0, 0, -1))):
        with Locations(Location((-150, 16, 0), (0, 0, 90))):
            Circle(SKETCH_6_R)
        with Locations(Location((-150, -16, 0), (0, 0, 270))):
            Circle(SKETCH_6_R)
        with Locations((48, -16)):
            Circle(SKETCH_6_R)
        with Locations((48, 16)):
            Circle(SKETCH_6_R)
    extrude(amount=-CUT_EXTRUDE_4_DEPTH, mode=Mode.SUBTRACT)

    # 草图7 → 凸台-拉伸3 (add)
    with BuildSketch(Plane(origin=(0, 0, 0), x_dir=(-1, 0, 0), z_dir=(0, 0, -1))):
        with BuildLine():
            ThreePointArc((48.887627564, 18.337117307), (45.628291755, 15.209430585), (50.112372436, 14.662882693))
            ThreePointArc((50.112372436, 14.662882693), (48.628291755, 16.209430585), (48.887627564, 18.337117307))
        make_face()
        with BuildLine():
            ThreePointArc((50.112372436, -14.662882693), (48.628291755, -16.209430585), (48.887627564, -18.337117307))
            ThreePointArc((48.887627564, -18.337117307), (45.628291755, -15.209430585), (50.112372436, -14.662882693))
        make_face()
    extrude(amount=-EXTRUDE_3_DEPTH)

    # 草图8 → 切除-拉伸5 (cut)
    with BuildSketch(Plane(origin=(0, 0, 0), x_dir=(-1, 0, 0), z_dir=(0, 0, -1))):
        with Locations(Location((-150, 16, 0), (0, 0, 90))):
            Circle(SKETCH_8_R)
        with Locations(Location((-150, -16, 0), (0, 0, 270))):
            Circle(SKETCH_8_R)
        with Locations(Location((150, -16, 0), (0, 0, 270))):
            Circle(SKETCH_8_R)
        with Locations(Location((150, 16, 0), (0, 0, 270))):
            Circle(SKETCH_8_R)
    extrude(amount=-CUT_EXTRUDE_5_DEPTH, mode=Mode.SUBTRACT)


solid = part.part
